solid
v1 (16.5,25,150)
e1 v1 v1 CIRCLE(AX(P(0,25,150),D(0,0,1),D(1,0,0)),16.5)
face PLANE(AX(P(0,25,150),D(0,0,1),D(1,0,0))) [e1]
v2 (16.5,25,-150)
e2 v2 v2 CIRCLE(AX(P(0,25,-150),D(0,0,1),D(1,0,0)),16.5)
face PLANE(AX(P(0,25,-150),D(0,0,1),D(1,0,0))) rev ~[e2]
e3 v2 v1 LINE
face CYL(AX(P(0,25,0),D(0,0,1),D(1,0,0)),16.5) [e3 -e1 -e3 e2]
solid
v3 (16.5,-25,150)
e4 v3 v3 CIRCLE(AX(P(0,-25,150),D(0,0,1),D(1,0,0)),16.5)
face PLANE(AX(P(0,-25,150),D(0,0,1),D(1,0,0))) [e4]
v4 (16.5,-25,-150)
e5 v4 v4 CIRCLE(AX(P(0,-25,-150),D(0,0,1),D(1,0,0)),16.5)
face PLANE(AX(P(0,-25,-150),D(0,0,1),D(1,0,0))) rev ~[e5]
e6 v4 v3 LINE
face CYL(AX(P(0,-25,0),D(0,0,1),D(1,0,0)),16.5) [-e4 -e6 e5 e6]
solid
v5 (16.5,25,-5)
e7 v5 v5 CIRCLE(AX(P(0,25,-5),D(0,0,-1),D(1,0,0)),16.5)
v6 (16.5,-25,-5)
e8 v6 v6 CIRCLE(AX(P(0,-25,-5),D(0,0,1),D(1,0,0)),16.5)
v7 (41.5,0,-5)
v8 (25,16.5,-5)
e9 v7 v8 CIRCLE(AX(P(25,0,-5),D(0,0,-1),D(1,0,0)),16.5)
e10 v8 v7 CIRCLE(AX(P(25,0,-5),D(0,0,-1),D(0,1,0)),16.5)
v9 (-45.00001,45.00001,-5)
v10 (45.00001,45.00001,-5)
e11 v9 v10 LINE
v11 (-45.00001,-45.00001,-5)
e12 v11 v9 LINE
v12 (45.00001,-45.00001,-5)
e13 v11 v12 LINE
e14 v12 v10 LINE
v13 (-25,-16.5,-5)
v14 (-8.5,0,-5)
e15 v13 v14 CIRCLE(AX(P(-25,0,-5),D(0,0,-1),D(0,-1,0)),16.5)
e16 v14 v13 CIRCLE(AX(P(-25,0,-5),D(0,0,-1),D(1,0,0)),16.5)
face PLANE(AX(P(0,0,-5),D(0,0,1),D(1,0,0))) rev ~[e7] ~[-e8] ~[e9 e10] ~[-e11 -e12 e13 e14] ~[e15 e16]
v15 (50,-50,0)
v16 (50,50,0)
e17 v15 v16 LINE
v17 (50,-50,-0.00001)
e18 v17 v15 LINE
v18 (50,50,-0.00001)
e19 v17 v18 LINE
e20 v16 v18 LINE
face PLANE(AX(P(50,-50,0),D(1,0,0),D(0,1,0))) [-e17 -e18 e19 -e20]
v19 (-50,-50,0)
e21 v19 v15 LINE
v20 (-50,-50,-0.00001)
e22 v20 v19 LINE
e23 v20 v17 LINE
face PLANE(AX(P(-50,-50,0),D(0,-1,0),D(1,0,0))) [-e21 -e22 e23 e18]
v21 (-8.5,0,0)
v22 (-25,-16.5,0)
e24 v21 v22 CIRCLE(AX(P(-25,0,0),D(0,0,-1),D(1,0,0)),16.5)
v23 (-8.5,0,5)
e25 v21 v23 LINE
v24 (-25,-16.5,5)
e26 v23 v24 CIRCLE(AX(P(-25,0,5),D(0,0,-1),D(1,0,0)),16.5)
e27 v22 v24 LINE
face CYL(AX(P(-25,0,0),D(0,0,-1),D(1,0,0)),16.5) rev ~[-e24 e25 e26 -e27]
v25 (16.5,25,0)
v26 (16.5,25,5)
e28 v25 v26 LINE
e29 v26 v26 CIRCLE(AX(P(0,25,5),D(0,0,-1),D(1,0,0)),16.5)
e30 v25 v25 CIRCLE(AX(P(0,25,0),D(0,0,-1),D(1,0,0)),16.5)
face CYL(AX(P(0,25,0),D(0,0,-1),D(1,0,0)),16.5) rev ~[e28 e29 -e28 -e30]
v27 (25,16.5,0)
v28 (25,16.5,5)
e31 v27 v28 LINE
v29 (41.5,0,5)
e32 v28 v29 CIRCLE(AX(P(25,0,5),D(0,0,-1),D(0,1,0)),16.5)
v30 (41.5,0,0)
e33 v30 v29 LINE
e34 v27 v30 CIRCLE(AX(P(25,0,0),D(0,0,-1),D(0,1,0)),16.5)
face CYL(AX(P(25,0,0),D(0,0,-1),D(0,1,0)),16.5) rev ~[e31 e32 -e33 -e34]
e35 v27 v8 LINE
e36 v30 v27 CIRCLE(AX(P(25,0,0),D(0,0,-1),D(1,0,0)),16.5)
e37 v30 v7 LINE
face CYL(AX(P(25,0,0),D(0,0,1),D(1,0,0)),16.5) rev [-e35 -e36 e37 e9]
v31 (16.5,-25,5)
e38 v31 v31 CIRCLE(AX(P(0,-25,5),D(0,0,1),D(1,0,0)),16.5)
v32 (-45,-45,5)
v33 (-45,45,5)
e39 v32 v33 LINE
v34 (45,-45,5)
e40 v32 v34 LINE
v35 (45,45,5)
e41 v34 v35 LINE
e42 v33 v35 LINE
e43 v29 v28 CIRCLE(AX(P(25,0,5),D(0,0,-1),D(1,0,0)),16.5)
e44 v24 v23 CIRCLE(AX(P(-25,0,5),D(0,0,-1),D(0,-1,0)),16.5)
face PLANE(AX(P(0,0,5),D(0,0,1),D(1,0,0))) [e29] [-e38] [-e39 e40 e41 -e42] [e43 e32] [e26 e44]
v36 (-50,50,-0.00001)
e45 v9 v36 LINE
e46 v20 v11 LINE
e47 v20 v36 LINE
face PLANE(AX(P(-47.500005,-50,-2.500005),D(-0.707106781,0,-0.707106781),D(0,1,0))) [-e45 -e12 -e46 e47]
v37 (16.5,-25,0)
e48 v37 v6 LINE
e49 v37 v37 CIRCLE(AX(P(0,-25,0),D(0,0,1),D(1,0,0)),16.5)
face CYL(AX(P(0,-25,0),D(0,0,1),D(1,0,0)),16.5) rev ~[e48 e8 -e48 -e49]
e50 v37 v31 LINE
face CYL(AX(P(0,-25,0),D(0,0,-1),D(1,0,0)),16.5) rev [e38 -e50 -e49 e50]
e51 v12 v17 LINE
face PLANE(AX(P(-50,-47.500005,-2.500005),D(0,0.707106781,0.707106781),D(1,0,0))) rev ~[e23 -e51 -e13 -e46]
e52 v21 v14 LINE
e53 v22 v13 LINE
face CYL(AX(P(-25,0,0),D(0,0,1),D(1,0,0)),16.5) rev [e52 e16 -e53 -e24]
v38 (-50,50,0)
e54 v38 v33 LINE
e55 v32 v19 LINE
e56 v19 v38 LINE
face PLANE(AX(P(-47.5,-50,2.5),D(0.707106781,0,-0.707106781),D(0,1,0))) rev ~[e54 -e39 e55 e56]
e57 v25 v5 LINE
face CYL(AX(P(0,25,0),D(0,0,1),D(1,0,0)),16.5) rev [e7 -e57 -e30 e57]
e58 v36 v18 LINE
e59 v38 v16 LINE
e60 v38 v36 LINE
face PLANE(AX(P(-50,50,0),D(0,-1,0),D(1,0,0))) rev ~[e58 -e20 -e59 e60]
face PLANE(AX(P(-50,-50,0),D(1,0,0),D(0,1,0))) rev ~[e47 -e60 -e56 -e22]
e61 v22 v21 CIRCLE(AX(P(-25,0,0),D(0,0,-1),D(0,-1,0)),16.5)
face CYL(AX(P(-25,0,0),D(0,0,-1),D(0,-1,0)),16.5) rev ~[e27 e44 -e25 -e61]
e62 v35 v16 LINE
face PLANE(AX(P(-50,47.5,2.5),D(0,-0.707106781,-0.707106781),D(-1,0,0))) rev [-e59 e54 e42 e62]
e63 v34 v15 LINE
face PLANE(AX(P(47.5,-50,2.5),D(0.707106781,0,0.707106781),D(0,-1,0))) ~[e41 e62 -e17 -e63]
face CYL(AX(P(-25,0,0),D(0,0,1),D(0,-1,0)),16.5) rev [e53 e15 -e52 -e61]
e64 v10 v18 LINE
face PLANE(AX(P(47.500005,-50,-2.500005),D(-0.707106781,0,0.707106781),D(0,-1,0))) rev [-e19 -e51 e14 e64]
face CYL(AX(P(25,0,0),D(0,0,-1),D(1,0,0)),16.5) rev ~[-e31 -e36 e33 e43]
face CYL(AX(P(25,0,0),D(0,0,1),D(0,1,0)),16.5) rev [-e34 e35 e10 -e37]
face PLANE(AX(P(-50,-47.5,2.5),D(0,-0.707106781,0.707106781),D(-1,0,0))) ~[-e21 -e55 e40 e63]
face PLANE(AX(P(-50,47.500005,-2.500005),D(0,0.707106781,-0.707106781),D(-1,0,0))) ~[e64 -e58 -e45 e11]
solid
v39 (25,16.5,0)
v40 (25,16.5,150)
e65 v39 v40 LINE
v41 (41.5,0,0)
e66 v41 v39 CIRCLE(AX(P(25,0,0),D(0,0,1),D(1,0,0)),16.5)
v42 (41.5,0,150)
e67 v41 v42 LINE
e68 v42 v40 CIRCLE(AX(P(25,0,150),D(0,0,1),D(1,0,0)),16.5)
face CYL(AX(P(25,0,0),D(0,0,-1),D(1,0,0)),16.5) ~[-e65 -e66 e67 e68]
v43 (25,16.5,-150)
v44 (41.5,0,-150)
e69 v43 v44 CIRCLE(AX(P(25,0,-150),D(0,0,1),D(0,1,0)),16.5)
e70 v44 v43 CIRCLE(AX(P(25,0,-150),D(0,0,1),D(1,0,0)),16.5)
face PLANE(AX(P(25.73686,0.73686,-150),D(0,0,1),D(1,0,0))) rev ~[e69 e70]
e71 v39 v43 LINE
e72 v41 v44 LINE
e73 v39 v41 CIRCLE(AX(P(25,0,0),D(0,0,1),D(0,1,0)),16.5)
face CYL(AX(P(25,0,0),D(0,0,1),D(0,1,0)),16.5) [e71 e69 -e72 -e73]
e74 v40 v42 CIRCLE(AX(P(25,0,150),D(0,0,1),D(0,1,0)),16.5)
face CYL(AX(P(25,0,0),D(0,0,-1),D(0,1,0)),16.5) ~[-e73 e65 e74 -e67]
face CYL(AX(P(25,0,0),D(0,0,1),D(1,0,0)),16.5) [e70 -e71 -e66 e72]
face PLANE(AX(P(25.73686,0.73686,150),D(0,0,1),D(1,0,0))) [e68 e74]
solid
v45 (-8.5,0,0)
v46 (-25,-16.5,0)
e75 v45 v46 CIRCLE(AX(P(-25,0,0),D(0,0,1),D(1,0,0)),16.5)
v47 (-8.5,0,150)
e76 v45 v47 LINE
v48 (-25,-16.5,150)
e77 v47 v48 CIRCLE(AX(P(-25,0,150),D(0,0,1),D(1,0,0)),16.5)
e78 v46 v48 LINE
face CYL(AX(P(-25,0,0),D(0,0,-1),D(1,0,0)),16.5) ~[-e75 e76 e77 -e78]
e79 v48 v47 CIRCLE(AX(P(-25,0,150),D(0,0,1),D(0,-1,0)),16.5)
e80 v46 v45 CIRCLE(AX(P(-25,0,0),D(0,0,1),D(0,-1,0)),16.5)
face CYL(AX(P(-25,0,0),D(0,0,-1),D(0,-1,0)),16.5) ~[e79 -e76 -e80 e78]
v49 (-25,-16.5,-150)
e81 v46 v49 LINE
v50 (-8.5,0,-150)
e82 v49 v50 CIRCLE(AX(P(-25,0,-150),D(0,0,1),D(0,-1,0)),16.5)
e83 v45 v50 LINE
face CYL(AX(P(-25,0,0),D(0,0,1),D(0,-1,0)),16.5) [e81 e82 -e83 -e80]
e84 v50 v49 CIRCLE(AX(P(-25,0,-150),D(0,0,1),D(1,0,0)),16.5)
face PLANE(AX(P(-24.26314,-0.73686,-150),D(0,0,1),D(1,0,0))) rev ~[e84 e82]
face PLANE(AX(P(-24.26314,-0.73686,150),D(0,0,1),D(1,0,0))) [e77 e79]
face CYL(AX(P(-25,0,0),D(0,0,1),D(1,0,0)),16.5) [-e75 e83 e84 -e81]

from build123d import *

# Parameters (mm, degrees)
F1_DEPTH = 150
F0_R     = 16.5
F0_W     = 100
F0_H     = 100
F2_DEPTH = 5
F3_SIZE  = 5
F4_SIZE  = 4.99999


# Not quite as in the source:
# - a fillet or chamfer is up to 0.001 mm smaller than in the source, because OpenCascade refuses the exact size


with BuildPart() as f1:
    # F0 (on Top) → F1 (new body, symmetric)
    with BuildSketch(Plane.XY):
        with BuildLine():
            ThreePointArc((-16.5, 25), (0, 8.5), (16.5, 25))
            ThreePointArc((16.5, 25), (0, 41.5), (-16.5, 25))
        make_face()
    extrude(amount=F1_DEPTH, both=True)


with BuildPart() as f1b:
    # F0 (on Top) → F1, piece 2 (new body, symmetric)
    with BuildSketch(Plane.XY):
        with BuildLine():
            ThreePointArc((-25, -16.5), (-13.3327381104, -11.6672618896), (-8.5, 0))
            ThreePointArc((-8.5, 0), (-36.6672618896, 11.6672618896), (-25, -16.5))
        make_face()
    extrude(amount=F1_DEPTH, both=True)


with BuildPart() as f1c:
    # F0 (on Top) → F1, piece 3 (new body, symmetric)
    with BuildSketch(Plane.XY):
        with BuildLine():
            ThreePointArc((25, 16.5), (13.3327381104, -11.6672618896), (41.5, 0))
            ThreePointArc((41.5, 0), (36.6672618896, 11.6672618896), (25, 16.5))
        make_face()
    extrude(amount=F1_DEPTH, both=True)


with BuildPart() as f1d:
    # F0 (on Top) → F1, piece 4 (new body, symmetric)
    with BuildSketch(Plane.XY):
        with Locations((0, -25)):
            Circle(F0_R)
    extrude(amount=F1_DEPTH, both=True)


with BuildPart() as f2:
    # F0 (on Top) → F2 (new body, symmetric)
    with BuildSketch(Plane.XY):
        Rectangle(F0_W, F0_H)
        with Locations((0, -25)):
            Circle(F0_R, mode=Mode.SUBTRACT)
        with BuildLine():
            ThreePointArc((-25, -16.5), (-36.6672618896, 11.6672618896), (-8.5, 0))
            ThreePointArc((-8.5, 0), (-13.3327381104, -11.6672618896), (-25, -16.5))
        make_face(mode=Mode.SUBTRACT)
        with BuildLine():
            ThreePointArc((25, 16.5), (36.6672618896, 11.6672618896), (41.5, 0))
            ThreePointArc((41.5, 0), (13.3327381104, -11.6672618896), (25, 16.5))
        make_face(mode=Mode.SUBTRACT)
        with BuildLine():
            ThreePointArc((-16.5, 25), (0, 41.5), (16.5, 25))
            ThreePointArc((16.5, 25), (0, 8.5), (-16.5, 25))
        make_face(mode=Mode.SUBTRACT)
    extrude(amount=F2_DEPTH, both=True)

    # F3
    f3_edges = [f2.edges().sort_by_distance(p)[0] for p in [
        (0, -50, 5),
        (50, 0, 5),
        (-50, 0, 5),
        (0, 50, 5),
    ]]
    chamfer(f3_edges, length=F3_SIZE)

    # F4 (size 5 in the source; OpenCascade refuses exactly that, so slightly less here)
    f4_edges = [f2.edges().sort_by_distance(p)[0] for p in [
        (0, 50, -5),
        (50, 0, -5),
        (0, -50, -5),
        (-50, 0, -5),
    ]]
    chamfer(f4_edges, length=F4_SIZE)


solid = Compound([f1.part, f1b.part, f1c.part, f1d.part, f2.part])
